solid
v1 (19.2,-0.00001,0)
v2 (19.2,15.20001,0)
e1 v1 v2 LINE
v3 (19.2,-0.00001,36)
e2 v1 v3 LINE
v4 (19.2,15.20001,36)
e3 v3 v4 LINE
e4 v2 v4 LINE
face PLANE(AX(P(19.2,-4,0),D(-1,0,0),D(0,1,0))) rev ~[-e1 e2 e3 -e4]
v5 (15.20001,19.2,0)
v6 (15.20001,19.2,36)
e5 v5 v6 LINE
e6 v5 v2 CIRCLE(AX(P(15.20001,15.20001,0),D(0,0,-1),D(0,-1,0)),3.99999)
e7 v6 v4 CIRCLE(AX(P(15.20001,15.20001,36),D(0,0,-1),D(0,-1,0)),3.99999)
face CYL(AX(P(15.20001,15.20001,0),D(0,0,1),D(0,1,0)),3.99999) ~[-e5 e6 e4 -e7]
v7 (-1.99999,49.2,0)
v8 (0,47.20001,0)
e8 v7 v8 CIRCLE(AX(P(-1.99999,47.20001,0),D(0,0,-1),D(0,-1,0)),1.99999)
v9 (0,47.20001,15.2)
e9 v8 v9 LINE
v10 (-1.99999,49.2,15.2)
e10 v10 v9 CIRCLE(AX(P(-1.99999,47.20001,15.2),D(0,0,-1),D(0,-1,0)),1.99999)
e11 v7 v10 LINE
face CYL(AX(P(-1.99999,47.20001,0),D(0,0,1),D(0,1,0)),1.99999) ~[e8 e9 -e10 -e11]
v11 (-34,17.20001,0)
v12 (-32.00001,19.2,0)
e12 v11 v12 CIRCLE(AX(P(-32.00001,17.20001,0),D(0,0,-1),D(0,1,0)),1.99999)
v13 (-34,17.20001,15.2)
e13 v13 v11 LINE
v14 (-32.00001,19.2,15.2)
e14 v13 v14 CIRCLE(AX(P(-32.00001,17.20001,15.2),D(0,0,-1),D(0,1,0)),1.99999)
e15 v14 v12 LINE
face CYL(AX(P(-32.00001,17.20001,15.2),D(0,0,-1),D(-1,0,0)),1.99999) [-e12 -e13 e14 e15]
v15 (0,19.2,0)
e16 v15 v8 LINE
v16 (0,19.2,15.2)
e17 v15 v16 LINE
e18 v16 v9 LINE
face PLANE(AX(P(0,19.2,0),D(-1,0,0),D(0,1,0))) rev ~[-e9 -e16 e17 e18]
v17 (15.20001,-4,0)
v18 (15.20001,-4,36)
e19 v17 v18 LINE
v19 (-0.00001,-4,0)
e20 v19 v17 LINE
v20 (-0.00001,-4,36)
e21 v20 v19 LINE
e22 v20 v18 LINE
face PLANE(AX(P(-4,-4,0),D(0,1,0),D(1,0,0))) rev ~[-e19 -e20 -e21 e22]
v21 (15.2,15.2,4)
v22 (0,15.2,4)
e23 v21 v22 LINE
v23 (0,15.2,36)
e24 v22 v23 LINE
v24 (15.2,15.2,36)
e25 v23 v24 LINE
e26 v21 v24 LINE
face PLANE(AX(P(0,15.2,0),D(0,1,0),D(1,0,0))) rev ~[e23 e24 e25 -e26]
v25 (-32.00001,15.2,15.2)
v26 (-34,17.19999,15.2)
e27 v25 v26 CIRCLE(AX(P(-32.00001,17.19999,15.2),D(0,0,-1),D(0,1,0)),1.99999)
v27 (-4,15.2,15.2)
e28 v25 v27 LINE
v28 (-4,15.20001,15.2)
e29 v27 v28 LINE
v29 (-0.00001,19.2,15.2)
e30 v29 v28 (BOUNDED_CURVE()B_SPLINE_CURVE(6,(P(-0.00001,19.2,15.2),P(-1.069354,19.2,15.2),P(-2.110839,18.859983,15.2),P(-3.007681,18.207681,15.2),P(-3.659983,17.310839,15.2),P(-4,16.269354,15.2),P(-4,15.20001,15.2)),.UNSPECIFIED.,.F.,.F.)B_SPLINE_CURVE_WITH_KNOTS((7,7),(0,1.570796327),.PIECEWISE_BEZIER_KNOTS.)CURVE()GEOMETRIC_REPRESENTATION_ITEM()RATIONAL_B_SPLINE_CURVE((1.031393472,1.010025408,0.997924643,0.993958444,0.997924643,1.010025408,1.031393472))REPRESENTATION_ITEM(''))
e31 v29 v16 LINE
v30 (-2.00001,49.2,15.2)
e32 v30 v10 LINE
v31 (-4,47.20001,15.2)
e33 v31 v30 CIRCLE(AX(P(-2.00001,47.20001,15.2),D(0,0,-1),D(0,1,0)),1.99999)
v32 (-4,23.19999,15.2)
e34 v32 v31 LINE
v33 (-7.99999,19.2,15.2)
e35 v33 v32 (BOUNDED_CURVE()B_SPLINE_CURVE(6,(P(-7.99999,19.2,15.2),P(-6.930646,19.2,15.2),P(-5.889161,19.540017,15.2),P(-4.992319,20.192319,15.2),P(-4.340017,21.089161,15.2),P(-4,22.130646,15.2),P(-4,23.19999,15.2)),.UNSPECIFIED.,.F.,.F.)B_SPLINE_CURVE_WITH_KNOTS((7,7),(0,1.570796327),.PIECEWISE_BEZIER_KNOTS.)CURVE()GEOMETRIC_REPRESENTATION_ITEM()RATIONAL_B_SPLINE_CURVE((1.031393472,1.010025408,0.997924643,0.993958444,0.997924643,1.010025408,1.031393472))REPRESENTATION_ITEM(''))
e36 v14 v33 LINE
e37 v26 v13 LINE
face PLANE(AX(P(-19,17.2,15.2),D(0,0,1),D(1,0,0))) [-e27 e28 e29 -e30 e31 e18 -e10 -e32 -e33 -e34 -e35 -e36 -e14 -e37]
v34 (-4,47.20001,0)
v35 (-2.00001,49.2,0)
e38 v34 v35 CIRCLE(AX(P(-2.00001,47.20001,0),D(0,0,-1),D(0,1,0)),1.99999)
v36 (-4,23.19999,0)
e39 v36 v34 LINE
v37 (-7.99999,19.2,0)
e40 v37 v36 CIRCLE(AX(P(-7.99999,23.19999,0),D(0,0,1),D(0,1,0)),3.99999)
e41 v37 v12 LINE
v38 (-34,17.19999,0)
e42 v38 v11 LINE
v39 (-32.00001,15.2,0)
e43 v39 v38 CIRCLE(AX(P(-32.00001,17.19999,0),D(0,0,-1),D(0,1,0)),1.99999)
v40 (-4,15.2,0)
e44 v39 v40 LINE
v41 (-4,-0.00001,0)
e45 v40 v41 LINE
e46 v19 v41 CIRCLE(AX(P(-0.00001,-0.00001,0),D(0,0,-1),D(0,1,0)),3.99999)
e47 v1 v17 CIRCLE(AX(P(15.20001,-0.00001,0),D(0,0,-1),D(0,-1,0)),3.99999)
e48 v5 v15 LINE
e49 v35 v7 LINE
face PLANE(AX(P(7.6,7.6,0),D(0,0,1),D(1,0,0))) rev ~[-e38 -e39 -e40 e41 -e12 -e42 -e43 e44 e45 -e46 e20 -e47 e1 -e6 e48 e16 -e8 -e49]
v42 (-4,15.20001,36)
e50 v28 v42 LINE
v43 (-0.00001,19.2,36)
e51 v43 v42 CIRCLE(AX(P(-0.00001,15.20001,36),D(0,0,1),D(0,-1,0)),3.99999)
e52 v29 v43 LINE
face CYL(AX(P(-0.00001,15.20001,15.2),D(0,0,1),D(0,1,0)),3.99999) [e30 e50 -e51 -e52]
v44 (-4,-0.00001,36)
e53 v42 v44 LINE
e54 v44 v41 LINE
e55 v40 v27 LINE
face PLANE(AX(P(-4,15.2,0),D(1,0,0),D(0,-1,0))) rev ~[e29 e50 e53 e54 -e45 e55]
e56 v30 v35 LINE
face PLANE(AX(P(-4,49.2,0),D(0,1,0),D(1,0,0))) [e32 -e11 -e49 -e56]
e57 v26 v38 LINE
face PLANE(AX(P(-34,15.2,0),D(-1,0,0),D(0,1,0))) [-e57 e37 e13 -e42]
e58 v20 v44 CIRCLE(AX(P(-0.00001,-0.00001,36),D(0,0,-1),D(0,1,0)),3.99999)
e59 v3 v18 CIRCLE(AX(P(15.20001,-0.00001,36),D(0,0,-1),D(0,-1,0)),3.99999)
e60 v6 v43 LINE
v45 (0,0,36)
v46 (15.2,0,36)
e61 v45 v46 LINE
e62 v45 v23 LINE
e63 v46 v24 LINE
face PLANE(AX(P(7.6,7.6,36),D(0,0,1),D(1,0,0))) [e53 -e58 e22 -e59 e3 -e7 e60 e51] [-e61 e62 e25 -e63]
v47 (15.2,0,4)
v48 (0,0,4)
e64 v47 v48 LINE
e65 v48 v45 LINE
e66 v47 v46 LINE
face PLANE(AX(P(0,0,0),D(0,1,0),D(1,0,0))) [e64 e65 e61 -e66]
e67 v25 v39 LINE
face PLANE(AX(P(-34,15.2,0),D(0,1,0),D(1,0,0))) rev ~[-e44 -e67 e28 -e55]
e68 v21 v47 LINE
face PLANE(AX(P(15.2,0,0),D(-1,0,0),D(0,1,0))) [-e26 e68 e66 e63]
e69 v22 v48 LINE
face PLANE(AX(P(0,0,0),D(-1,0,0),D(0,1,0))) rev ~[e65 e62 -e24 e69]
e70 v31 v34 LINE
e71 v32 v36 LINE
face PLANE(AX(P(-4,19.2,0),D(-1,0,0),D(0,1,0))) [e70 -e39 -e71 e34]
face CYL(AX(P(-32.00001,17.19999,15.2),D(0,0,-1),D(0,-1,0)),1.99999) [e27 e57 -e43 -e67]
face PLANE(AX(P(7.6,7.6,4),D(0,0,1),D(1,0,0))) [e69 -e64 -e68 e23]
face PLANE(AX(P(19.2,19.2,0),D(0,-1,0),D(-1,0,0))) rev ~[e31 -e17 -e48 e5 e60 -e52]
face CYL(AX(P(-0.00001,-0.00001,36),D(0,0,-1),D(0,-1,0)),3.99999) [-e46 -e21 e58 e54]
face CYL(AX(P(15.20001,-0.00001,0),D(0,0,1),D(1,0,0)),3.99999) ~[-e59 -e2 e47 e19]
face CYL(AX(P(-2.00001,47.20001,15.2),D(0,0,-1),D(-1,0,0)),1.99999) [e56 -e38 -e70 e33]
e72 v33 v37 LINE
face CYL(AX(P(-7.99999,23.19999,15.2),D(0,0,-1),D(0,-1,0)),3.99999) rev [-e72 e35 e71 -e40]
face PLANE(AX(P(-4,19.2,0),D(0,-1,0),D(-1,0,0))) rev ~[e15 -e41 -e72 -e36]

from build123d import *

# Parameters (mm, degrees)
F0_W     = 15.2
F0_H     = 15.2
F0_W_2   = 30
F0_H_2   = 4
F0_W_3   = 4
F0_H_3   = 30
F1_DEPTH = 4
F2_DEPTH = 36
F3_DEPTH = 15.2
F4_R     = 3.99999
F6_R     = 1.99999


# Not quite as in the source:
# - a fillet or chamfer is up to 0.001 mm smaller than in the source, because OpenCascade refuses the exact size
# - a feature of the source that left no trace in its solid (it failed there, or was rolled back) is left out


with BuildPart() as f1:
    # F0 (on Top) → F1 (new body)
    with BuildSketch(Plane.XY):
        Polygon((-4, 15.2), (-4, -4), (19.2, -4), (19.2, 19.2), (0, 19.2), (-4, 19.2), align=None)
        with Locations((7.6, 7.6)):
            Rectangle(F0_W, F0_H, mode=Mode.SUBTRACT)
        with Locations((-19, 17.2)):
            Rectangle(F0_W_2, F0_H_2)
        with Locations((-2, 34.2)):
            Rectangle(F0_W_3, F0_H_3)
        with Locations((7.6, 7.6)):
            Rectangle(F0_W, F0_H)
    extrude(amount=F1_DEPTH)

    # F0 (on Top) → F2 (join)
    with BuildSketch(Plane.XY):
        Polygon((-4, 15.2), (-4, -4), (19.2, -4), (19.2, 19.2), (0, 19.2), (-4, 19.2), align=None)
        with Locations((7.6, 7.6)):
            Rectangle(F0_W, F0_H, mode=Mode.SUBTRACT)
    extrude(amount=F2_DEPTH)

    # F0 (on Top) → F3 (join)
    with BuildSketch(Plane.XY):
        with Locations((-19, 17.2)):
            Rectangle(F0_W_2, F0_H_2)
        with Locations((-2, 34.2)):
            Rectangle(F0_W_3, F0_H_3)
    extrude(amount=F3_DEPTH)

    # F4 (radius 4 in the source; OpenCascade refuses exactly that, so slightly less here)
    f4_edges = [f1.edges().sort_by_distance(p)[0] for p in [
        (-4, -4, 18),
        (19.2, -4, 18),
        (19.2, 19.2, 18),
        (-4, 19.2, 7.6),
        (-4, 19.2, 25.6),
    ]]
    fillet(f4_edges, radius=F4_R)

    # F6 (radius 2 in the source; OpenCascade refuses exactly that, so slightly less here)
    f6_edges = [f1.edges().sort_by_distance(p)[0] for p in [
        (0, 49.2, 7.6),
        (-4, 49.2, 7.6),
        (-34, 19.2, 7.6),
        (-34, 15.2, 7.6),
    ]]
    fillet(f6_edges, radius=F6_R)


solid = f1.part
